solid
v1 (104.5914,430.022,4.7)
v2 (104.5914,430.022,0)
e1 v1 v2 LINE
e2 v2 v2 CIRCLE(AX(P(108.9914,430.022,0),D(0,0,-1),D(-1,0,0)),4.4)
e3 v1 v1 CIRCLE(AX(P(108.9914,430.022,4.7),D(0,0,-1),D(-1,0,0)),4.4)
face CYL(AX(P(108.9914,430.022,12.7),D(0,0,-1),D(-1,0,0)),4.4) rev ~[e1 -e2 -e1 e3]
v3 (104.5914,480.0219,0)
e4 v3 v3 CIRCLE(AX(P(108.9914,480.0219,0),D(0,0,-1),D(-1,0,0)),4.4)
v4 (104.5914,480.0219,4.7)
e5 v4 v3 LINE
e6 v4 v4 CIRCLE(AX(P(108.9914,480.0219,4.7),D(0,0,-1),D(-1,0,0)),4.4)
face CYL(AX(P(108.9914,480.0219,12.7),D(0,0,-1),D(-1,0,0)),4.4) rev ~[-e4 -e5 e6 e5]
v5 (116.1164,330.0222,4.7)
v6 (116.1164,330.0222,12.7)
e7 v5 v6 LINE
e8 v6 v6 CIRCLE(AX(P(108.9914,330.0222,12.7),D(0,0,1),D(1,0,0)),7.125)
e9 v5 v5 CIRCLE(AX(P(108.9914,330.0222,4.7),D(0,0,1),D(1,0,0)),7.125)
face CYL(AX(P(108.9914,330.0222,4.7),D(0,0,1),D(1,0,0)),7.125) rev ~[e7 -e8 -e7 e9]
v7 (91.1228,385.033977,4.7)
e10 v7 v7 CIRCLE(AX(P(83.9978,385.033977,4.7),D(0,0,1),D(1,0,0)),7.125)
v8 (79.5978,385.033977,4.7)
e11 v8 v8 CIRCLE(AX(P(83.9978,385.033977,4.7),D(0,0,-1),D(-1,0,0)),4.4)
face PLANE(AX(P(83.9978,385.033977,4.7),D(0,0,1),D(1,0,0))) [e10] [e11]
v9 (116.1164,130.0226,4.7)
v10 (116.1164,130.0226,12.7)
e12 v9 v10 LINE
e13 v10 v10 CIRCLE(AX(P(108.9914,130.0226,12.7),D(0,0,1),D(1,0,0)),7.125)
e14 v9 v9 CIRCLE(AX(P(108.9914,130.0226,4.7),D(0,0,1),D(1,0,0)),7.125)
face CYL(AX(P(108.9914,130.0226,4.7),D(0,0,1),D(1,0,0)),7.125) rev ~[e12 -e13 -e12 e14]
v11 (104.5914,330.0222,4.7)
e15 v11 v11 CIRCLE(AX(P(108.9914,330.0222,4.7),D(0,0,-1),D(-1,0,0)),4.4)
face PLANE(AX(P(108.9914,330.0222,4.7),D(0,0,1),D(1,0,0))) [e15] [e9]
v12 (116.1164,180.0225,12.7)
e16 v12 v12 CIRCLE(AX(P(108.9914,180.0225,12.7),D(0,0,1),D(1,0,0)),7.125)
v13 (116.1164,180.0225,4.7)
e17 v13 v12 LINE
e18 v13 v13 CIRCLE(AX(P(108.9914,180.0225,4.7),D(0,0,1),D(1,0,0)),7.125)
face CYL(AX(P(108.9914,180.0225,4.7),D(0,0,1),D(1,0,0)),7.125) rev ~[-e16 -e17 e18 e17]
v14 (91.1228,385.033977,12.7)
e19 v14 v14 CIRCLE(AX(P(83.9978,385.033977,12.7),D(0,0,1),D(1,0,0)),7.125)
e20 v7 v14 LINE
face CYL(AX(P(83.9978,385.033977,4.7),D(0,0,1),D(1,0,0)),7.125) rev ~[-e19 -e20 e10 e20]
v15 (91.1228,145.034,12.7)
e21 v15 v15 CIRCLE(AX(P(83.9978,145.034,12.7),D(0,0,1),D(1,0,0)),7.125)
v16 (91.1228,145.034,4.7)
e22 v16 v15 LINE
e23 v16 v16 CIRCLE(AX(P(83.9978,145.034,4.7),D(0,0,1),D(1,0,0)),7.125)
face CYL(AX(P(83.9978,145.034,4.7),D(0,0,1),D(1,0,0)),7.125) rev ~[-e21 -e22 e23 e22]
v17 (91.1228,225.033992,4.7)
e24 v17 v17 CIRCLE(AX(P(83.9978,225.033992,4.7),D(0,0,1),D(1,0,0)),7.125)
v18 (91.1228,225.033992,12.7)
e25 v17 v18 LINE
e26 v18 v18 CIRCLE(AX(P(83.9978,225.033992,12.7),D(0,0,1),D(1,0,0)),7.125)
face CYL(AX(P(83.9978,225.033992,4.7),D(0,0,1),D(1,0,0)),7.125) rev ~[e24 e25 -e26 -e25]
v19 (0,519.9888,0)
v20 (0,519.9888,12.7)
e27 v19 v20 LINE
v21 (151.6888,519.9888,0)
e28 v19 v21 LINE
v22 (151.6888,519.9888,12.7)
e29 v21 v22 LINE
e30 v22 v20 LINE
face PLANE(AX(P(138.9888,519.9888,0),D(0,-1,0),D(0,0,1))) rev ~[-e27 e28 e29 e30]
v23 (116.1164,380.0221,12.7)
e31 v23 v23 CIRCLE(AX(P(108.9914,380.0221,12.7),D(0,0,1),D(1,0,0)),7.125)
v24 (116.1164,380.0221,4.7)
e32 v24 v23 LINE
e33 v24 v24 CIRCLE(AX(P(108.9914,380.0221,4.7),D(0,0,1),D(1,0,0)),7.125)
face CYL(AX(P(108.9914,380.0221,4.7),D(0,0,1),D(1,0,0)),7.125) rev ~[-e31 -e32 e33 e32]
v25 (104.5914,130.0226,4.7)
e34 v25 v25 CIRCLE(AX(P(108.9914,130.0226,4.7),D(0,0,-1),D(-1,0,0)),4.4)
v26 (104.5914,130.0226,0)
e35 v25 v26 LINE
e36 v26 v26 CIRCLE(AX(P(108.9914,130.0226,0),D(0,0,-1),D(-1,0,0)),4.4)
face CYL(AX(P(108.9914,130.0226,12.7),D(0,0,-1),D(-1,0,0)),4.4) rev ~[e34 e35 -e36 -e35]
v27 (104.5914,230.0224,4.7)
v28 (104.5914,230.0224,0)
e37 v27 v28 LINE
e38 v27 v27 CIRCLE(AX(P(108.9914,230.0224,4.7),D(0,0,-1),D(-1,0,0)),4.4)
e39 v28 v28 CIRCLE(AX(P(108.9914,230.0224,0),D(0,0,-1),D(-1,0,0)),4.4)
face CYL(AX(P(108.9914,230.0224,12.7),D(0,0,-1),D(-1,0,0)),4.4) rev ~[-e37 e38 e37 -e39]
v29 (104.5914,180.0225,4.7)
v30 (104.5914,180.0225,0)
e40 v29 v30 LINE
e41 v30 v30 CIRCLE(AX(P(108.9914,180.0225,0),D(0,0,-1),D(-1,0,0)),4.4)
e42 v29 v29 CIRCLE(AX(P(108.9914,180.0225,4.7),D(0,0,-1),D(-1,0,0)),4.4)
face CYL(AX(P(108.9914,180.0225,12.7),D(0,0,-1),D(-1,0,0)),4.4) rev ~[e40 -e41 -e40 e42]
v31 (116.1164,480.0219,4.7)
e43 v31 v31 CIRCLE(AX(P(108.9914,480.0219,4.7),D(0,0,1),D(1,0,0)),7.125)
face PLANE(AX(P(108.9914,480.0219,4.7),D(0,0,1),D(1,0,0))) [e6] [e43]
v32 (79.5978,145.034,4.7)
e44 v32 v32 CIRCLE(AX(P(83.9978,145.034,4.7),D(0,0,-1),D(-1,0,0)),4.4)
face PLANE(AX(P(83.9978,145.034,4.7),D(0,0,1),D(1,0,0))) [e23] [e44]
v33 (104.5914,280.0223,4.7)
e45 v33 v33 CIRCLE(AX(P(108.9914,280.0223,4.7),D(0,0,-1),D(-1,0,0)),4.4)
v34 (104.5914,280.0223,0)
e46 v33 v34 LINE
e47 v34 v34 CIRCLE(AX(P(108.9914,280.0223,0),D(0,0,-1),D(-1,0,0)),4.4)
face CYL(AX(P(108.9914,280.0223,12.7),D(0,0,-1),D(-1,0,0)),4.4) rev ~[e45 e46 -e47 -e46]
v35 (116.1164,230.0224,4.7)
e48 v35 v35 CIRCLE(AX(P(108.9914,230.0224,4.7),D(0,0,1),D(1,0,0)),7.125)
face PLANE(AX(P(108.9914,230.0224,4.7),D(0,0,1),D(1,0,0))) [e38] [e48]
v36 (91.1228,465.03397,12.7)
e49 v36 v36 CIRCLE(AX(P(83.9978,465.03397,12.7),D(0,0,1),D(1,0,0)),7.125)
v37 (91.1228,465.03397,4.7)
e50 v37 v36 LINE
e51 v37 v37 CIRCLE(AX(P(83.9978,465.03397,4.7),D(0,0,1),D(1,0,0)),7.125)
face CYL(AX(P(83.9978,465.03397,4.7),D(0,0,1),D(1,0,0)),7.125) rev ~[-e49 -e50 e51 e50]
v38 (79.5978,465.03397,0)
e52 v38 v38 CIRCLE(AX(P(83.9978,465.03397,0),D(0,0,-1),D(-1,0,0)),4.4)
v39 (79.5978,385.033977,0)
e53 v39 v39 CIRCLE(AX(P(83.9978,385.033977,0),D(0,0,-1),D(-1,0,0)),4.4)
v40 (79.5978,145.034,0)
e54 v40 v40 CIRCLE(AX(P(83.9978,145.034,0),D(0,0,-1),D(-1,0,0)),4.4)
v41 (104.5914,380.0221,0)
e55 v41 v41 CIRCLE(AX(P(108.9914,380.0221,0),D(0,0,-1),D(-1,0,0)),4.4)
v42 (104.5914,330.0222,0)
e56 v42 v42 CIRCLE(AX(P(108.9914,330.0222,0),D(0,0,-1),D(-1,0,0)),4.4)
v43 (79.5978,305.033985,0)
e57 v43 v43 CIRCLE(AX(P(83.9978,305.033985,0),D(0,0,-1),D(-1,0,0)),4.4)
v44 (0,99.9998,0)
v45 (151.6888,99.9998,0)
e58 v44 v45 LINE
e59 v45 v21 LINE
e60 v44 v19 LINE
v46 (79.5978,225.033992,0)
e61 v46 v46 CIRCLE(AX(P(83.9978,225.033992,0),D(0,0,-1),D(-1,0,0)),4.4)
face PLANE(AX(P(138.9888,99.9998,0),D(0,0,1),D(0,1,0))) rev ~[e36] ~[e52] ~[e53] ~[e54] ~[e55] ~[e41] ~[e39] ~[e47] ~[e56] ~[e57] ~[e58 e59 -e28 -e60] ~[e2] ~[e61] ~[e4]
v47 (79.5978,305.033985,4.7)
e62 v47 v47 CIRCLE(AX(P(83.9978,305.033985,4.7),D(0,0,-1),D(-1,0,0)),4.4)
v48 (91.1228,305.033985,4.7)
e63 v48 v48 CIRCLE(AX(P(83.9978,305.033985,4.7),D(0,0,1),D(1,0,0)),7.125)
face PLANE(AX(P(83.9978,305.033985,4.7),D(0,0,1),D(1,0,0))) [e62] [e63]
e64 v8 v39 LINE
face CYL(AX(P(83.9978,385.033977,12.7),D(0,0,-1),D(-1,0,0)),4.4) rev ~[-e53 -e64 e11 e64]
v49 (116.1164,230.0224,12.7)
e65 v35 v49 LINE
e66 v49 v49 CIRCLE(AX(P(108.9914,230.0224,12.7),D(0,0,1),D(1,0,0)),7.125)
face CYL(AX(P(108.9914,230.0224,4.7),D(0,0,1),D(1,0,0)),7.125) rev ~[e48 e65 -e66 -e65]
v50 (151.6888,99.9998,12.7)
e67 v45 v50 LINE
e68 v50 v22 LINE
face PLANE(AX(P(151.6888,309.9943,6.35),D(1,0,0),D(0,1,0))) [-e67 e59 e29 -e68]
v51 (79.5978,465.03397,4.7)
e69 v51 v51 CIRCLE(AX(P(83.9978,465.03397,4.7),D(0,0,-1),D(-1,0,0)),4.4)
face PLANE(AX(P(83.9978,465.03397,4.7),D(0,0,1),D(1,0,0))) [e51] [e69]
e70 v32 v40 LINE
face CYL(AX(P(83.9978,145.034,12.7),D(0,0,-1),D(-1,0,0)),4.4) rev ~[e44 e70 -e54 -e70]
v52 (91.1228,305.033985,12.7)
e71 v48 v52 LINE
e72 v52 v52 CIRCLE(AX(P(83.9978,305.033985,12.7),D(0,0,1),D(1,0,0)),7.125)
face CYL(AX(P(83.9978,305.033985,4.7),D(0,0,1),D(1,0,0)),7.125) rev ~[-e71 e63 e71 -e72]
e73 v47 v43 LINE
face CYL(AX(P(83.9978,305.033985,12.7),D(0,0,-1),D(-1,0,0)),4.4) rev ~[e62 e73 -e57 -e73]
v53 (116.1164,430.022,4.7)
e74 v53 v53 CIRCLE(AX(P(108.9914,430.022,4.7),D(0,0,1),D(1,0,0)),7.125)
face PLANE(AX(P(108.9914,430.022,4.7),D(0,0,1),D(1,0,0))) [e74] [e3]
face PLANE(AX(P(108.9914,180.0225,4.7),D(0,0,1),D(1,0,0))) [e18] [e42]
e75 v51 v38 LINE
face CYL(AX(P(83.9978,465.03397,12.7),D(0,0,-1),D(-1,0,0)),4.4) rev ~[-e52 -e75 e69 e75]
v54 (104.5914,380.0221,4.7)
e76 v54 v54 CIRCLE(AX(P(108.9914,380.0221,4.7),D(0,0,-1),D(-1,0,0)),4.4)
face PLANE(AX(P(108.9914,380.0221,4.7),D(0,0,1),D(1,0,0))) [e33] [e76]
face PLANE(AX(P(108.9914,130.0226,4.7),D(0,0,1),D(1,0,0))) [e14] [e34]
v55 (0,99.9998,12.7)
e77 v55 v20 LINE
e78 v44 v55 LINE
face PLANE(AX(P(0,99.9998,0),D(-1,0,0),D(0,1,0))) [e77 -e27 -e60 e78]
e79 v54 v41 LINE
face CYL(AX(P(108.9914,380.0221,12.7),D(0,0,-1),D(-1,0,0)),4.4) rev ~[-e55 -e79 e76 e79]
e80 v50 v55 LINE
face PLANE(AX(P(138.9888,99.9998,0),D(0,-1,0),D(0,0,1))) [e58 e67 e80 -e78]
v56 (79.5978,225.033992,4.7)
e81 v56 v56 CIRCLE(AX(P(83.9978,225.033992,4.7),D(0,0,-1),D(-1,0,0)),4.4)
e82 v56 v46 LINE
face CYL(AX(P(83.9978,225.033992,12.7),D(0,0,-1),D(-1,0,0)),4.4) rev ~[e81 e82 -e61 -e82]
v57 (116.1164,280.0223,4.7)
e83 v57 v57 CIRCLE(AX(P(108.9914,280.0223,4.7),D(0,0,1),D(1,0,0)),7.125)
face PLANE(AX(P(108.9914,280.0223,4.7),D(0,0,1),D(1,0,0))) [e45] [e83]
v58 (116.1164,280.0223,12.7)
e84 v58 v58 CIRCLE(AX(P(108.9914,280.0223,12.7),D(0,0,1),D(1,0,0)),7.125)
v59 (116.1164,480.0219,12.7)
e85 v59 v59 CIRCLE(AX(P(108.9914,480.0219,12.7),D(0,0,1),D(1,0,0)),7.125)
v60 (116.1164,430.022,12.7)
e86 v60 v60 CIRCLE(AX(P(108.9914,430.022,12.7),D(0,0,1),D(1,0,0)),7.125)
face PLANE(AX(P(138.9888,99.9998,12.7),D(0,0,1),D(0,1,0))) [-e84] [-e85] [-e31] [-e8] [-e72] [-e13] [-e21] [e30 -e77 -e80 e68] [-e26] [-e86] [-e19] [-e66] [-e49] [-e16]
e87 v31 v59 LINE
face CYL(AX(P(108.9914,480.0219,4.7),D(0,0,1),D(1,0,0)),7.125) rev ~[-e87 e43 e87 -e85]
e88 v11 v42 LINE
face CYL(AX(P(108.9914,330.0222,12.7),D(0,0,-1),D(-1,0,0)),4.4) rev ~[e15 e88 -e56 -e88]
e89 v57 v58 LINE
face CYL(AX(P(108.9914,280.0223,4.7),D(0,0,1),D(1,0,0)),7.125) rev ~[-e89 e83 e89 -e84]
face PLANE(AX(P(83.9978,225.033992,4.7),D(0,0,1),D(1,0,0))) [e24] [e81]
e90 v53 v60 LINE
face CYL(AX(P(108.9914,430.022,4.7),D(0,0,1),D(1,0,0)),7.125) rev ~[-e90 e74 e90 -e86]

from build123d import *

# Parameters (mm, degrees)
F0_W           = 138.9888
F0_H           = 419.989
F1_DEPTH       = 12.7
F3_D           = 8.8
F3_CBORE_D     = 14.25
F3_CBORE_DEPTH = 8
F4_W           = 419.989
F4_H           = 12.7
F5_DEPTH       = 12.7


# Not quite as in the source:
# - a feature names something its author has since deleted; it is built from what else it names


with BuildPart() as f1:
    # F0 (on Top) → F1 (new body)
    with BuildSketch(Plane.XY):
        with Locations((69.4944, 309.9943)):
            Rectangle(F0_W, F0_H)
    extrude(amount=F1_DEPTH)

    # F3 (through all)
    with Locations(Plane.XY.offset(12.7)):
        with Locations((83.9978, 465.0339696), (83.9978, 385.0339772), (83.9978, 305.0339848), (83.9978, 225.0339924), (83.9978, 145.034), (108.9914, 130.0226), (108.9914, 180.0225), (108.9914, 230.0224), (108.9914, 280.0223), (108.9914, 330.0222), (108.9914, 380.0221), (108.9914, 430.022), (108.9914, 480.0219)):
            CounterBoreHole(F3_D / 2, F3_CBORE_D / 2, F3_CBORE_DEPTH)

    # F4 (on face) → F5 (join)
    with BuildSketch(Plane.YZ.offset(138.9888)):
        with Locations((309.9943, 6.35)):
            Rectangle(F4_W, F4_H)
    extrude(amount=F5_DEPTH)


solid = f1.part
